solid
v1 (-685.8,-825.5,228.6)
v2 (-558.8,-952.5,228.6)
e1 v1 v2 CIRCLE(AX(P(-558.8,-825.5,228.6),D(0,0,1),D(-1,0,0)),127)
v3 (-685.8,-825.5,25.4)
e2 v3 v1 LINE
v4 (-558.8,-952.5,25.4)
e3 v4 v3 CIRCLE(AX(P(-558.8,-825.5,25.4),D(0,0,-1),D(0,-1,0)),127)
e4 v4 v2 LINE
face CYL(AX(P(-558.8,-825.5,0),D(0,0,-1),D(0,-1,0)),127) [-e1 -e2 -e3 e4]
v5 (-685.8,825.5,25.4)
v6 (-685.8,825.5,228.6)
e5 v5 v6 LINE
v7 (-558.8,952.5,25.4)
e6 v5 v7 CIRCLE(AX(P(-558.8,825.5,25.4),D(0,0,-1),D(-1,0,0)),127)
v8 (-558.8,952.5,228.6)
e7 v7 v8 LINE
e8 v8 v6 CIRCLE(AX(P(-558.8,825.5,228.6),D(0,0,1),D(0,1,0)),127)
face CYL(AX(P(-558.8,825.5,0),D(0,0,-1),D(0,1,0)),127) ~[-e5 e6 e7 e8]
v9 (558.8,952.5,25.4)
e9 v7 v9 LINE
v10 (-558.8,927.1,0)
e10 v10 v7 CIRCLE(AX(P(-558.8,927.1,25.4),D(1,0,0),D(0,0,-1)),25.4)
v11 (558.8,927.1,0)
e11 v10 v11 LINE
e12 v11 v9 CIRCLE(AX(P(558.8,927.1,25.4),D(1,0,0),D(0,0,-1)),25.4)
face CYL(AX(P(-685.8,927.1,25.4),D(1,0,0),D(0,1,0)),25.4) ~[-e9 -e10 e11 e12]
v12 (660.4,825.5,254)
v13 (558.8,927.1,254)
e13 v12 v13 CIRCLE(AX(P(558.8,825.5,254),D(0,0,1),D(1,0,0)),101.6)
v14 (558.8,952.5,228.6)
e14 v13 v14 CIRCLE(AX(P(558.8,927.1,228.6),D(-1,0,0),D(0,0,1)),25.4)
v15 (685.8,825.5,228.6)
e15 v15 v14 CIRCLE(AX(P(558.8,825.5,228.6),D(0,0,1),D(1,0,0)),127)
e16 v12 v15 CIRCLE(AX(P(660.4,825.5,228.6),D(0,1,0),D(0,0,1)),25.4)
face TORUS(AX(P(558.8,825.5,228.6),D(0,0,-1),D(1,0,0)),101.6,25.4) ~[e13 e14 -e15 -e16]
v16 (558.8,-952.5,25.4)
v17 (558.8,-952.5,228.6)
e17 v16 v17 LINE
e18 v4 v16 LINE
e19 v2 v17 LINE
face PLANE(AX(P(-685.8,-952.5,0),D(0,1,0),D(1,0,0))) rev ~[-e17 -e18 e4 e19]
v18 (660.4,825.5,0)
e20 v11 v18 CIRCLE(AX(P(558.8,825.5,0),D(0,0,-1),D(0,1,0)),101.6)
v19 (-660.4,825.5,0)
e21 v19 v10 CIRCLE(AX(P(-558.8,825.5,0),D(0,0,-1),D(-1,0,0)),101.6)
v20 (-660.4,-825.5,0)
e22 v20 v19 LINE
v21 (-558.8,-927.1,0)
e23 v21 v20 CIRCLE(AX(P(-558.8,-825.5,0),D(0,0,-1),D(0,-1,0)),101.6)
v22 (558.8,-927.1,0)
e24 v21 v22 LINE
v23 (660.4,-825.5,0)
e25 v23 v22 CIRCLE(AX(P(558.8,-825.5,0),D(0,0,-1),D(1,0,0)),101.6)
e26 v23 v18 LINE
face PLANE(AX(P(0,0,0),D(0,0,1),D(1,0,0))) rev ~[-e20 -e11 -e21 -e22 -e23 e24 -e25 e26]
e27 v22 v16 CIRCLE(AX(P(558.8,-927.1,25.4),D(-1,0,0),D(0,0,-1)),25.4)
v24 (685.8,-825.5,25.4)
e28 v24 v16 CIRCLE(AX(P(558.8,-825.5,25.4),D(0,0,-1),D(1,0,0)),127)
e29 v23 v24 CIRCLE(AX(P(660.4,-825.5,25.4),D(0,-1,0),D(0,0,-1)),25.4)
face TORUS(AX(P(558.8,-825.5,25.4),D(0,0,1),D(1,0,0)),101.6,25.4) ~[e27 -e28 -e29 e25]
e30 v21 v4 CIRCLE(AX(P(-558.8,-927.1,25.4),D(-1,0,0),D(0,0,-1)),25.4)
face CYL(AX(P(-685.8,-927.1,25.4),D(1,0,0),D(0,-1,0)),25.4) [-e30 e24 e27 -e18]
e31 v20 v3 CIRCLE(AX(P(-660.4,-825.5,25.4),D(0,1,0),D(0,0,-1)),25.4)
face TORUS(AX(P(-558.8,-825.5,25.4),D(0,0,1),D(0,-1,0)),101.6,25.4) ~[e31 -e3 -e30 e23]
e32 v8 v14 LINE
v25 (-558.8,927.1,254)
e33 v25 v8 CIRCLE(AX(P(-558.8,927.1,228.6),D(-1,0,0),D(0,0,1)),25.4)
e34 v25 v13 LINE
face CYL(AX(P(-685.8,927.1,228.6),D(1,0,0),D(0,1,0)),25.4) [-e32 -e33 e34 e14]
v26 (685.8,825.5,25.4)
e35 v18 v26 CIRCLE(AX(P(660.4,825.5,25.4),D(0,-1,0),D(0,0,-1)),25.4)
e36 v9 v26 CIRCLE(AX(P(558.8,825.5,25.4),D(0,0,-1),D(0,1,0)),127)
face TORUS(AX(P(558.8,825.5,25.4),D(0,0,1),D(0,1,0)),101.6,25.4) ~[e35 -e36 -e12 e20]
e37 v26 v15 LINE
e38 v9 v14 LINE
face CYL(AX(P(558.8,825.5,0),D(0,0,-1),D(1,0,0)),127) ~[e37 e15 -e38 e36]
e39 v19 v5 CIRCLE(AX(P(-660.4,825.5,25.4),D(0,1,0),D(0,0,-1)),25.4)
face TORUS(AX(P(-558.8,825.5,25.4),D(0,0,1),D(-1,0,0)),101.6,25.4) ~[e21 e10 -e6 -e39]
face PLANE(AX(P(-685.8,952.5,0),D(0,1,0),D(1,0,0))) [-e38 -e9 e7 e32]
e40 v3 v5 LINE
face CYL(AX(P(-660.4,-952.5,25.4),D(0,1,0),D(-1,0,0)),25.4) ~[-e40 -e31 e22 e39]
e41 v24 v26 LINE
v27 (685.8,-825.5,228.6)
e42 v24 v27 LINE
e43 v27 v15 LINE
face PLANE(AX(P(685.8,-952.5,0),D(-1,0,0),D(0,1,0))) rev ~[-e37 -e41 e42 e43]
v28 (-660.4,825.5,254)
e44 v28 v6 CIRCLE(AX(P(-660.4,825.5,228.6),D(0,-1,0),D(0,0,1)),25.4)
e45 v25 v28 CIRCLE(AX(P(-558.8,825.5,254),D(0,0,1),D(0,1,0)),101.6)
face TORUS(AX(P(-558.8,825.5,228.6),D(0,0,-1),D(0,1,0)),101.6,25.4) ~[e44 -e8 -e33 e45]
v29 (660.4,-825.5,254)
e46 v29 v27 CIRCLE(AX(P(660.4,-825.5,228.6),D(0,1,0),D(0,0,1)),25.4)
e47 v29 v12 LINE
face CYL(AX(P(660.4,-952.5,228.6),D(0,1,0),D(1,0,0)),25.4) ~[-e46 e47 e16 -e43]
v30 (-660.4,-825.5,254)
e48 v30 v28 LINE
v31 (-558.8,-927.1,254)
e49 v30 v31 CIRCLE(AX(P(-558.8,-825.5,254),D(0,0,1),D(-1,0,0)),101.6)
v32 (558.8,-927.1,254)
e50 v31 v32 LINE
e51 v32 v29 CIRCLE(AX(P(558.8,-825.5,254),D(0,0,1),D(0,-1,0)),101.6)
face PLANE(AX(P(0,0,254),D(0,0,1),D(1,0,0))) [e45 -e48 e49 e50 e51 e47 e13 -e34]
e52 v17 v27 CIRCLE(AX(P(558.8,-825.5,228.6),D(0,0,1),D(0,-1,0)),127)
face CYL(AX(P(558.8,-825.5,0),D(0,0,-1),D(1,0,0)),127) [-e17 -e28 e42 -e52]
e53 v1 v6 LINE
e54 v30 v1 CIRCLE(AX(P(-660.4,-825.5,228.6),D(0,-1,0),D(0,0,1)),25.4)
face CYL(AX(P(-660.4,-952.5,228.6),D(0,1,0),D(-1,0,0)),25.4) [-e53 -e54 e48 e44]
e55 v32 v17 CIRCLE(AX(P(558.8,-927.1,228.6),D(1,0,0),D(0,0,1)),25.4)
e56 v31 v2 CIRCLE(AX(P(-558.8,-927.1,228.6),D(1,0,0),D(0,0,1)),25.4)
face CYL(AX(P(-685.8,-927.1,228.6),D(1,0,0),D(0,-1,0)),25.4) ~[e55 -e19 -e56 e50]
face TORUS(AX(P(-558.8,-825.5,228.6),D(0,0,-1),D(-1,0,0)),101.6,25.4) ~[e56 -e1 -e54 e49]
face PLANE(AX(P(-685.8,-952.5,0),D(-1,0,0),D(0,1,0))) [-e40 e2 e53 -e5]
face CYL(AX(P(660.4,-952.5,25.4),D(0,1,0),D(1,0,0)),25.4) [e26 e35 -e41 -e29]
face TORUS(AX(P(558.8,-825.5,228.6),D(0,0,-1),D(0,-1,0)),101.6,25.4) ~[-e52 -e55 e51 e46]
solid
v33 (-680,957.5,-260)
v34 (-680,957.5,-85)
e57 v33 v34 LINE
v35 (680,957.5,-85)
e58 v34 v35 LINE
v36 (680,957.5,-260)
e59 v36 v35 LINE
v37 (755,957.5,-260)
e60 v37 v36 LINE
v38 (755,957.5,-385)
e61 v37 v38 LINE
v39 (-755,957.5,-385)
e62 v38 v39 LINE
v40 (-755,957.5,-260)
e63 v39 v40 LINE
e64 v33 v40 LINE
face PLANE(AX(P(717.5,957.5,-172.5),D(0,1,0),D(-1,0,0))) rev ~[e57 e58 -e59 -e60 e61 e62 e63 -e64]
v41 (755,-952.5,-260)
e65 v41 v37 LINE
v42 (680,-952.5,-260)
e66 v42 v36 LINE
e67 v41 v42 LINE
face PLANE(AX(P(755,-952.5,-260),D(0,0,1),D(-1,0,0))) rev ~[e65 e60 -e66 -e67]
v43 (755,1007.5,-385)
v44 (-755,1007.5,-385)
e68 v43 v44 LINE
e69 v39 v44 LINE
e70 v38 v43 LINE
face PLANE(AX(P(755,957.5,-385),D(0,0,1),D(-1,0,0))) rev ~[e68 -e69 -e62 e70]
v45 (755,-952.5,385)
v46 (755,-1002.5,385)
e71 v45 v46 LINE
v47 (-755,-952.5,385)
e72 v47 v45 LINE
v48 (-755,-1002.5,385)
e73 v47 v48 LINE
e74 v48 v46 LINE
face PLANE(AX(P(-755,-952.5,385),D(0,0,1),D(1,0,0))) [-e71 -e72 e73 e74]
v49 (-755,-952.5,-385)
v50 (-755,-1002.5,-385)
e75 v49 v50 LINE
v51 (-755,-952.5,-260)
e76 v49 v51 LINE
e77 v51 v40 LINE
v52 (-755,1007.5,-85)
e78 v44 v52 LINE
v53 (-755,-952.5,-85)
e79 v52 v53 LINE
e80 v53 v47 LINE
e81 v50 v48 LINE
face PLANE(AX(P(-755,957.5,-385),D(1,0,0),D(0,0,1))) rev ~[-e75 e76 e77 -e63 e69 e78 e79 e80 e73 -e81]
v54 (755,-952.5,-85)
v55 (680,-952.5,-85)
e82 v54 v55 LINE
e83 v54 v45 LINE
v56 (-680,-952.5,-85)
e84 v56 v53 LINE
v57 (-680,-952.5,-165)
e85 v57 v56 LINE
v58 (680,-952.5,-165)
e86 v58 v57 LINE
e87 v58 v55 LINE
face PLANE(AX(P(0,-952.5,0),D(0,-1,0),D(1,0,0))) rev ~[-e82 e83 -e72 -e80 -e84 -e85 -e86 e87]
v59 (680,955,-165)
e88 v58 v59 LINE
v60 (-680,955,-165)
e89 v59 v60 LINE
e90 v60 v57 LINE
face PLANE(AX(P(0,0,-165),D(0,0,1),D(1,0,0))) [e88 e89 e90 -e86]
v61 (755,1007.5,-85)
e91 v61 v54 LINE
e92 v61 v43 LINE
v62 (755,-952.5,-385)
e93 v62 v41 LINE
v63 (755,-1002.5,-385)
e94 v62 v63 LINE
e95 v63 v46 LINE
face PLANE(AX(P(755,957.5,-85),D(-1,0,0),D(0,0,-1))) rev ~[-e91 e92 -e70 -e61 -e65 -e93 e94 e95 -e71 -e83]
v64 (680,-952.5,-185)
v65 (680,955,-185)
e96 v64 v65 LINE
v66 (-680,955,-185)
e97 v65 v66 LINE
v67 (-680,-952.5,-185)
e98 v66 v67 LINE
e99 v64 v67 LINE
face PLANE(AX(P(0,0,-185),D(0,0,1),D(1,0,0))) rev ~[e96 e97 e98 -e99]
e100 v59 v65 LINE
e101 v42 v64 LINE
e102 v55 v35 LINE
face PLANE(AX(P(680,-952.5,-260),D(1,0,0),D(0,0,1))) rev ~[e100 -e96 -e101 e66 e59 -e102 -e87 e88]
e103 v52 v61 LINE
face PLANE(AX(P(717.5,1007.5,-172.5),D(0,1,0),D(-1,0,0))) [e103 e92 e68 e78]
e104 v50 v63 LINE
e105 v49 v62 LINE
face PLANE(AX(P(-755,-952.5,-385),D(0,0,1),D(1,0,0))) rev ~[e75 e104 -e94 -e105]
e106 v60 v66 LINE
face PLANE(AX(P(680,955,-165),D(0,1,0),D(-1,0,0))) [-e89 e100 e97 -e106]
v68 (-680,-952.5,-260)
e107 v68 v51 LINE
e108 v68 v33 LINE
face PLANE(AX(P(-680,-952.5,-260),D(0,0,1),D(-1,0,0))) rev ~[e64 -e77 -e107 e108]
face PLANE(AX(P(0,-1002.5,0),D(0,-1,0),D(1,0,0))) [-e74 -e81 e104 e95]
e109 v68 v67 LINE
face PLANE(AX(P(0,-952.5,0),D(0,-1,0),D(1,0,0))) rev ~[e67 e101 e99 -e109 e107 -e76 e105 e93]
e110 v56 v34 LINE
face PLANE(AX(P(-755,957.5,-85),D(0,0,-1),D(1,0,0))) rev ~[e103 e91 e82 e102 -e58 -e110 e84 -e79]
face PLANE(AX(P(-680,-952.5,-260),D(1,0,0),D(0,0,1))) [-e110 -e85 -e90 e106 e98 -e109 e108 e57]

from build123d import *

# Parameters (mm, degrees)
F0_W         = 1371.6
F0_H         = 1905
F1_DEPTH     = 254
F2_R         = 25.4
F3_T1_DEPTH  = 254
F3_T4_ANGLE  = 90
F3_T6_ANGLE  = 90
F3_T8_ANGLE  = 90
F3_T10_ANGLE = 90
F3_T12_ANGLE = 90
F3_T14_ANGLE = 90
F3_T16_ANGLE = 90
F3_T18_ANGLE = 90
F4_W         = 1510
F4_H         = 770
F4_W_2       = 1117.6
F4_H_2       = 203.2
F5_DEPTH     = 50
F6_W         = 75
F6_H         = 175
F7_DEPTH     = 1910
F8_W         = 75
F8_H         = 175
F9_DEPTH     = 50
F11_START    = -80
F11_DEPTH    = 20


# Not quite as in the source:
# - a fillet or chamfer that OpenCascade refuses, or shapes differently, is made with other operations: its cross-section is extruded or revolved along the edge and cut away or added


with BuildPart() as f1:
    # F0 (on Top) → F1 (new body)
    with BuildSketch(Plane.XY):
        Rectangle(F0_W, F0_H)
    extrude(amount=F1_DEPTH)

    # F2
    f2_edges = [f1.edges().sort_by_distance(p)[0] for p in [
        (-685.8, 0, 254),
        (0, 952.5, 254),
        (685.8, 0, 254),
        (0, -952.5, 254),
        (685.8, 0, 0),
        (0, 952.5, 0),
        (-685.8, 0, 0),
        (0, -952.5, 0),
    ]]
    fillet(f2_edges, radius=F2_R)

    # F3: fillet of radius 127 on 4 edges, made by hand

    # F3_s2 → F3_t1 (cut)
    with BuildSketch(Plane.XY):
        with BuildLine():
            ThreePointArc((685.8, -825.5), (648.6025612107, -915.3025612107), (558.8, -952.5))
            Line((558.8, -952.5), (685.8, -952.5))
            Line((685.8, -952.5), (685.8, -825.5))
        make_face()
        with BuildLine():
            ThreePointArc((685.8, 825.5), (648.6025612107, 915.3025612107), (558.8, 952.5))
            Line((558.8, 952.5), (685.8, 952.5))
            Line((685.8, 952.5), (685.8, 825.5))
        make_face()
        with BuildLine():
            ThreePointArc((-558.8, 952.5), (-648.6025612107, 915.3025612107), (-685.8, 825.5))
            Line((-685.8, 825.5), (-685.8, 952.5))
            Line((-685.8, 952.5), (-558.8, 952.5))
        make_face()
        with BuildLine():
            ThreePointArc((-558.8, -952.5), (-648.6025612107, -915.3025612107), (-685.8, -825.5))
            Line((-685.8, -825.5), (-685.8, -952.5))
            Line((-685.8, -952.5), (-558.8, -952.5))
        make_face()
    extrude(amount=F3_T1_DEPTH, mode=Mode.SUBTRACT)

    # F3_s3 → F3_t4 (revolve, cut)
    with BuildSketch(Plane.YZ.offset(-558.8)):
        with BuildLine():
            ThreePointArc((-927.1, 0), (-945.0605122421, 7.4394877579), (-952.5, 25.4))
            Line((-952.5, 25.4), (-952.5, 0))
            Line((-952.5, 0), (-927.1, 0))
        make_face()
    revolve(axis=Axis((-558.8, -825.5, 0), (0, 0, -1)), revolution_arc=F3_T4_ANGLE, mode=Mode.SUBTRACT)

    # F3_s5 → F3_t6 (revolve, cut)
    with BuildSketch(Plane.XZ.offset(825.5)):
        with BuildLine():
            ThreePointArc((-660.4, 254), (-678.3605122421, 246.5605122421), (-685.8, 228.6))
            Line((-685.8, 228.6), (-685.8, 254))
            Line((-685.8, 254), (-660.4, 254))
        make_face()
    revolve(axis=Axis((-558.8, -825.5, 254), (0, 0, 1)), revolution_arc=F3_T6_ANGLE, mode=Mode.SUBTRACT)

    # F3_s7 → F3_t8 (revolve, cut)
    with BuildSketch(Plane.XZ.offset(-825.5)):
        with BuildLine():
            ThreePointArc((-660.4, 0), (-678.3605122421, 7.4394877579), (-685.8, 25.4))
            Line((-685.8, 25.4), (-685.8, 0))
            Line((-685.8, 0), (-660.4, 0))
        make_face()
    revolve(axis=Axis((-558.8, 825.5, 0), (0, 0, -1)), revolution_arc=F3_T8_ANGLE, mode=Mode.SUBTRACT)

    # F3_s9 → F3_t10 (revolve, cut)
    with BuildSketch(Plane.YZ.offset(-558.8)):
        with BuildLine():
            ThreePointArc((927.1, 254), (945.0605122421, 246.5605122421), (952.5, 228.6))
            Line((952.5, 228.6), (952.5, 254))
            Line((952.5, 254), (927.1, 254))
        make_face()
    revolve(axis=Axis((-558.8, 825.5, 254), (0, 0, 1)), revolution_arc=F3_T10_ANGLE, mode=Mode.SUBTRACT)

    # F3_s11 → F3_t12 (revolve, cut)
    with BuildSketch(Plane.YZ.offset(558.8)):
        with BuildLine():
            ThreePointArc((927.1, 0), (945.0605122421, 7.4394877579), (952.5, 25.4))
            Line((952.5, 25.4), (952.5, 0))
            Line((952.5, 0), (927.1, 0))
        make_face()
    revolve(axis=Axis((558.8, 825.5, 0), (0, 0, -1)), revolution_arc=F3_T12_ANGLE, mode=Mode.SUBTRACT)

    # F3_s13 → F3_t14 (revolve, cut)
    with BuildSketch(Plane.XZ.offset(-825.5)):
        with BuildLine():
            ThreePointArc((660.4, 254), (678.3605122421, 246.5605122421), (685.8, 228.6))
            Line((685.8, 228.6), (685.8, 254))
            Line((685.8, 254), (660.4, 254))
        make_face()
    revolve(axis=Axis((558.8, 825.5, 254), (0, 0, 1)), revolution_arc=F3_T14_ANGLE, mode=Mode.SUBTRACT)

    # F3_s15 → F3_t16 (revolve, cut)
    with BuildSketch(Plane.XZ.offset(825.5)):
        with BuildLine():
            ThreePointArc((660.4, 0), (678.3605122421, 7.4394877579), (685.8, 25.4))
            Line((685.8, 25.4), (685.8, 0))
            Line((685.8, 0), (660.4, 0))
        make_face()
    revolve(axis=Axis((558.8, -825.5, 0), (0, 0, -1)), revolution_arc=F3_T16_ANGLE, mode=Mode.SUBTRACT)

    # F3_s17 → F3_t18 (revolve, cut)
    with BuildSketch(Plane.YZ.offset(558.8)):
        with BuildLine():
            ThreePointArc((-927.1, 254), (-945.0605122421, 246.5605122421), (-952.5, 228.6))
            Line((-952.5, 228.6), (-952.5, 254))
            Line((-952.5, 254), (-927.1, 254))
        make_face()
    revolve(axis=Axis((558.8, -825.5, 254), (0, 0, 1)), revolution_arc=F3_T18_ANGLE, mode=Mode.SUBTRACT)


with BuildPart() as f5:
    # F4 (on face) → F5 (new body)
    with BuildSketch(Plane.XZ.offset(952.5)):
        Rectangle(F4_W, F4_H)
        with Locations((0, 127)):
            Rectangle(F4_W_2, F4_H_2, mode=Mode.SUBTRACT)
        with Locations((0, 127)):
            Rectangle(F4_W_2, F4_H_2)
    extrude(amount=F5_DEPTH)

    # F6 (on face) → F7 (join)
    with BuildSketch(Plane(origin=(0, -952.5, 0), x_dir=(-1, 0, 0), z_dir=(0, 1, 0))):
        with Locations((-717.5, -172.5)):
            Rectangle(F6_W, F6_H)
        with Locations((717.5, -172.5)):
            Rectangle(F6_W, F6_H)
    extrude(amount=F7_DEPTH)

    # F8 (on face) → F9 (join)
    with BuildSketch(Plane(origin=(0, 957.5, 0), x_dir=(-1, 0, 0), z_dir=(0, 1, 0))):
        with Locations((-717.5, -172.5)):
            Rectangle(F8_W, F8_H)
        Polygon((755, -85), (-680, -85), (-680, -260), (-755, -260), (-755, -385), (755, -385), align=None)
    extrude(amount=F9_DEPTH)

    # F10 (on face) → F11 (join)
    with BuildSketch(Plane.XY.offset(-85).offset(F11_START)):
        Polygon((680, 955), (-680, 955), (-680, -952.5), (-680, -955), (680, -955), (680, -952.5), align=None)
    extrude(amount=-F11_DEPTH)


solid = Compound([f1.part, f5.part])
